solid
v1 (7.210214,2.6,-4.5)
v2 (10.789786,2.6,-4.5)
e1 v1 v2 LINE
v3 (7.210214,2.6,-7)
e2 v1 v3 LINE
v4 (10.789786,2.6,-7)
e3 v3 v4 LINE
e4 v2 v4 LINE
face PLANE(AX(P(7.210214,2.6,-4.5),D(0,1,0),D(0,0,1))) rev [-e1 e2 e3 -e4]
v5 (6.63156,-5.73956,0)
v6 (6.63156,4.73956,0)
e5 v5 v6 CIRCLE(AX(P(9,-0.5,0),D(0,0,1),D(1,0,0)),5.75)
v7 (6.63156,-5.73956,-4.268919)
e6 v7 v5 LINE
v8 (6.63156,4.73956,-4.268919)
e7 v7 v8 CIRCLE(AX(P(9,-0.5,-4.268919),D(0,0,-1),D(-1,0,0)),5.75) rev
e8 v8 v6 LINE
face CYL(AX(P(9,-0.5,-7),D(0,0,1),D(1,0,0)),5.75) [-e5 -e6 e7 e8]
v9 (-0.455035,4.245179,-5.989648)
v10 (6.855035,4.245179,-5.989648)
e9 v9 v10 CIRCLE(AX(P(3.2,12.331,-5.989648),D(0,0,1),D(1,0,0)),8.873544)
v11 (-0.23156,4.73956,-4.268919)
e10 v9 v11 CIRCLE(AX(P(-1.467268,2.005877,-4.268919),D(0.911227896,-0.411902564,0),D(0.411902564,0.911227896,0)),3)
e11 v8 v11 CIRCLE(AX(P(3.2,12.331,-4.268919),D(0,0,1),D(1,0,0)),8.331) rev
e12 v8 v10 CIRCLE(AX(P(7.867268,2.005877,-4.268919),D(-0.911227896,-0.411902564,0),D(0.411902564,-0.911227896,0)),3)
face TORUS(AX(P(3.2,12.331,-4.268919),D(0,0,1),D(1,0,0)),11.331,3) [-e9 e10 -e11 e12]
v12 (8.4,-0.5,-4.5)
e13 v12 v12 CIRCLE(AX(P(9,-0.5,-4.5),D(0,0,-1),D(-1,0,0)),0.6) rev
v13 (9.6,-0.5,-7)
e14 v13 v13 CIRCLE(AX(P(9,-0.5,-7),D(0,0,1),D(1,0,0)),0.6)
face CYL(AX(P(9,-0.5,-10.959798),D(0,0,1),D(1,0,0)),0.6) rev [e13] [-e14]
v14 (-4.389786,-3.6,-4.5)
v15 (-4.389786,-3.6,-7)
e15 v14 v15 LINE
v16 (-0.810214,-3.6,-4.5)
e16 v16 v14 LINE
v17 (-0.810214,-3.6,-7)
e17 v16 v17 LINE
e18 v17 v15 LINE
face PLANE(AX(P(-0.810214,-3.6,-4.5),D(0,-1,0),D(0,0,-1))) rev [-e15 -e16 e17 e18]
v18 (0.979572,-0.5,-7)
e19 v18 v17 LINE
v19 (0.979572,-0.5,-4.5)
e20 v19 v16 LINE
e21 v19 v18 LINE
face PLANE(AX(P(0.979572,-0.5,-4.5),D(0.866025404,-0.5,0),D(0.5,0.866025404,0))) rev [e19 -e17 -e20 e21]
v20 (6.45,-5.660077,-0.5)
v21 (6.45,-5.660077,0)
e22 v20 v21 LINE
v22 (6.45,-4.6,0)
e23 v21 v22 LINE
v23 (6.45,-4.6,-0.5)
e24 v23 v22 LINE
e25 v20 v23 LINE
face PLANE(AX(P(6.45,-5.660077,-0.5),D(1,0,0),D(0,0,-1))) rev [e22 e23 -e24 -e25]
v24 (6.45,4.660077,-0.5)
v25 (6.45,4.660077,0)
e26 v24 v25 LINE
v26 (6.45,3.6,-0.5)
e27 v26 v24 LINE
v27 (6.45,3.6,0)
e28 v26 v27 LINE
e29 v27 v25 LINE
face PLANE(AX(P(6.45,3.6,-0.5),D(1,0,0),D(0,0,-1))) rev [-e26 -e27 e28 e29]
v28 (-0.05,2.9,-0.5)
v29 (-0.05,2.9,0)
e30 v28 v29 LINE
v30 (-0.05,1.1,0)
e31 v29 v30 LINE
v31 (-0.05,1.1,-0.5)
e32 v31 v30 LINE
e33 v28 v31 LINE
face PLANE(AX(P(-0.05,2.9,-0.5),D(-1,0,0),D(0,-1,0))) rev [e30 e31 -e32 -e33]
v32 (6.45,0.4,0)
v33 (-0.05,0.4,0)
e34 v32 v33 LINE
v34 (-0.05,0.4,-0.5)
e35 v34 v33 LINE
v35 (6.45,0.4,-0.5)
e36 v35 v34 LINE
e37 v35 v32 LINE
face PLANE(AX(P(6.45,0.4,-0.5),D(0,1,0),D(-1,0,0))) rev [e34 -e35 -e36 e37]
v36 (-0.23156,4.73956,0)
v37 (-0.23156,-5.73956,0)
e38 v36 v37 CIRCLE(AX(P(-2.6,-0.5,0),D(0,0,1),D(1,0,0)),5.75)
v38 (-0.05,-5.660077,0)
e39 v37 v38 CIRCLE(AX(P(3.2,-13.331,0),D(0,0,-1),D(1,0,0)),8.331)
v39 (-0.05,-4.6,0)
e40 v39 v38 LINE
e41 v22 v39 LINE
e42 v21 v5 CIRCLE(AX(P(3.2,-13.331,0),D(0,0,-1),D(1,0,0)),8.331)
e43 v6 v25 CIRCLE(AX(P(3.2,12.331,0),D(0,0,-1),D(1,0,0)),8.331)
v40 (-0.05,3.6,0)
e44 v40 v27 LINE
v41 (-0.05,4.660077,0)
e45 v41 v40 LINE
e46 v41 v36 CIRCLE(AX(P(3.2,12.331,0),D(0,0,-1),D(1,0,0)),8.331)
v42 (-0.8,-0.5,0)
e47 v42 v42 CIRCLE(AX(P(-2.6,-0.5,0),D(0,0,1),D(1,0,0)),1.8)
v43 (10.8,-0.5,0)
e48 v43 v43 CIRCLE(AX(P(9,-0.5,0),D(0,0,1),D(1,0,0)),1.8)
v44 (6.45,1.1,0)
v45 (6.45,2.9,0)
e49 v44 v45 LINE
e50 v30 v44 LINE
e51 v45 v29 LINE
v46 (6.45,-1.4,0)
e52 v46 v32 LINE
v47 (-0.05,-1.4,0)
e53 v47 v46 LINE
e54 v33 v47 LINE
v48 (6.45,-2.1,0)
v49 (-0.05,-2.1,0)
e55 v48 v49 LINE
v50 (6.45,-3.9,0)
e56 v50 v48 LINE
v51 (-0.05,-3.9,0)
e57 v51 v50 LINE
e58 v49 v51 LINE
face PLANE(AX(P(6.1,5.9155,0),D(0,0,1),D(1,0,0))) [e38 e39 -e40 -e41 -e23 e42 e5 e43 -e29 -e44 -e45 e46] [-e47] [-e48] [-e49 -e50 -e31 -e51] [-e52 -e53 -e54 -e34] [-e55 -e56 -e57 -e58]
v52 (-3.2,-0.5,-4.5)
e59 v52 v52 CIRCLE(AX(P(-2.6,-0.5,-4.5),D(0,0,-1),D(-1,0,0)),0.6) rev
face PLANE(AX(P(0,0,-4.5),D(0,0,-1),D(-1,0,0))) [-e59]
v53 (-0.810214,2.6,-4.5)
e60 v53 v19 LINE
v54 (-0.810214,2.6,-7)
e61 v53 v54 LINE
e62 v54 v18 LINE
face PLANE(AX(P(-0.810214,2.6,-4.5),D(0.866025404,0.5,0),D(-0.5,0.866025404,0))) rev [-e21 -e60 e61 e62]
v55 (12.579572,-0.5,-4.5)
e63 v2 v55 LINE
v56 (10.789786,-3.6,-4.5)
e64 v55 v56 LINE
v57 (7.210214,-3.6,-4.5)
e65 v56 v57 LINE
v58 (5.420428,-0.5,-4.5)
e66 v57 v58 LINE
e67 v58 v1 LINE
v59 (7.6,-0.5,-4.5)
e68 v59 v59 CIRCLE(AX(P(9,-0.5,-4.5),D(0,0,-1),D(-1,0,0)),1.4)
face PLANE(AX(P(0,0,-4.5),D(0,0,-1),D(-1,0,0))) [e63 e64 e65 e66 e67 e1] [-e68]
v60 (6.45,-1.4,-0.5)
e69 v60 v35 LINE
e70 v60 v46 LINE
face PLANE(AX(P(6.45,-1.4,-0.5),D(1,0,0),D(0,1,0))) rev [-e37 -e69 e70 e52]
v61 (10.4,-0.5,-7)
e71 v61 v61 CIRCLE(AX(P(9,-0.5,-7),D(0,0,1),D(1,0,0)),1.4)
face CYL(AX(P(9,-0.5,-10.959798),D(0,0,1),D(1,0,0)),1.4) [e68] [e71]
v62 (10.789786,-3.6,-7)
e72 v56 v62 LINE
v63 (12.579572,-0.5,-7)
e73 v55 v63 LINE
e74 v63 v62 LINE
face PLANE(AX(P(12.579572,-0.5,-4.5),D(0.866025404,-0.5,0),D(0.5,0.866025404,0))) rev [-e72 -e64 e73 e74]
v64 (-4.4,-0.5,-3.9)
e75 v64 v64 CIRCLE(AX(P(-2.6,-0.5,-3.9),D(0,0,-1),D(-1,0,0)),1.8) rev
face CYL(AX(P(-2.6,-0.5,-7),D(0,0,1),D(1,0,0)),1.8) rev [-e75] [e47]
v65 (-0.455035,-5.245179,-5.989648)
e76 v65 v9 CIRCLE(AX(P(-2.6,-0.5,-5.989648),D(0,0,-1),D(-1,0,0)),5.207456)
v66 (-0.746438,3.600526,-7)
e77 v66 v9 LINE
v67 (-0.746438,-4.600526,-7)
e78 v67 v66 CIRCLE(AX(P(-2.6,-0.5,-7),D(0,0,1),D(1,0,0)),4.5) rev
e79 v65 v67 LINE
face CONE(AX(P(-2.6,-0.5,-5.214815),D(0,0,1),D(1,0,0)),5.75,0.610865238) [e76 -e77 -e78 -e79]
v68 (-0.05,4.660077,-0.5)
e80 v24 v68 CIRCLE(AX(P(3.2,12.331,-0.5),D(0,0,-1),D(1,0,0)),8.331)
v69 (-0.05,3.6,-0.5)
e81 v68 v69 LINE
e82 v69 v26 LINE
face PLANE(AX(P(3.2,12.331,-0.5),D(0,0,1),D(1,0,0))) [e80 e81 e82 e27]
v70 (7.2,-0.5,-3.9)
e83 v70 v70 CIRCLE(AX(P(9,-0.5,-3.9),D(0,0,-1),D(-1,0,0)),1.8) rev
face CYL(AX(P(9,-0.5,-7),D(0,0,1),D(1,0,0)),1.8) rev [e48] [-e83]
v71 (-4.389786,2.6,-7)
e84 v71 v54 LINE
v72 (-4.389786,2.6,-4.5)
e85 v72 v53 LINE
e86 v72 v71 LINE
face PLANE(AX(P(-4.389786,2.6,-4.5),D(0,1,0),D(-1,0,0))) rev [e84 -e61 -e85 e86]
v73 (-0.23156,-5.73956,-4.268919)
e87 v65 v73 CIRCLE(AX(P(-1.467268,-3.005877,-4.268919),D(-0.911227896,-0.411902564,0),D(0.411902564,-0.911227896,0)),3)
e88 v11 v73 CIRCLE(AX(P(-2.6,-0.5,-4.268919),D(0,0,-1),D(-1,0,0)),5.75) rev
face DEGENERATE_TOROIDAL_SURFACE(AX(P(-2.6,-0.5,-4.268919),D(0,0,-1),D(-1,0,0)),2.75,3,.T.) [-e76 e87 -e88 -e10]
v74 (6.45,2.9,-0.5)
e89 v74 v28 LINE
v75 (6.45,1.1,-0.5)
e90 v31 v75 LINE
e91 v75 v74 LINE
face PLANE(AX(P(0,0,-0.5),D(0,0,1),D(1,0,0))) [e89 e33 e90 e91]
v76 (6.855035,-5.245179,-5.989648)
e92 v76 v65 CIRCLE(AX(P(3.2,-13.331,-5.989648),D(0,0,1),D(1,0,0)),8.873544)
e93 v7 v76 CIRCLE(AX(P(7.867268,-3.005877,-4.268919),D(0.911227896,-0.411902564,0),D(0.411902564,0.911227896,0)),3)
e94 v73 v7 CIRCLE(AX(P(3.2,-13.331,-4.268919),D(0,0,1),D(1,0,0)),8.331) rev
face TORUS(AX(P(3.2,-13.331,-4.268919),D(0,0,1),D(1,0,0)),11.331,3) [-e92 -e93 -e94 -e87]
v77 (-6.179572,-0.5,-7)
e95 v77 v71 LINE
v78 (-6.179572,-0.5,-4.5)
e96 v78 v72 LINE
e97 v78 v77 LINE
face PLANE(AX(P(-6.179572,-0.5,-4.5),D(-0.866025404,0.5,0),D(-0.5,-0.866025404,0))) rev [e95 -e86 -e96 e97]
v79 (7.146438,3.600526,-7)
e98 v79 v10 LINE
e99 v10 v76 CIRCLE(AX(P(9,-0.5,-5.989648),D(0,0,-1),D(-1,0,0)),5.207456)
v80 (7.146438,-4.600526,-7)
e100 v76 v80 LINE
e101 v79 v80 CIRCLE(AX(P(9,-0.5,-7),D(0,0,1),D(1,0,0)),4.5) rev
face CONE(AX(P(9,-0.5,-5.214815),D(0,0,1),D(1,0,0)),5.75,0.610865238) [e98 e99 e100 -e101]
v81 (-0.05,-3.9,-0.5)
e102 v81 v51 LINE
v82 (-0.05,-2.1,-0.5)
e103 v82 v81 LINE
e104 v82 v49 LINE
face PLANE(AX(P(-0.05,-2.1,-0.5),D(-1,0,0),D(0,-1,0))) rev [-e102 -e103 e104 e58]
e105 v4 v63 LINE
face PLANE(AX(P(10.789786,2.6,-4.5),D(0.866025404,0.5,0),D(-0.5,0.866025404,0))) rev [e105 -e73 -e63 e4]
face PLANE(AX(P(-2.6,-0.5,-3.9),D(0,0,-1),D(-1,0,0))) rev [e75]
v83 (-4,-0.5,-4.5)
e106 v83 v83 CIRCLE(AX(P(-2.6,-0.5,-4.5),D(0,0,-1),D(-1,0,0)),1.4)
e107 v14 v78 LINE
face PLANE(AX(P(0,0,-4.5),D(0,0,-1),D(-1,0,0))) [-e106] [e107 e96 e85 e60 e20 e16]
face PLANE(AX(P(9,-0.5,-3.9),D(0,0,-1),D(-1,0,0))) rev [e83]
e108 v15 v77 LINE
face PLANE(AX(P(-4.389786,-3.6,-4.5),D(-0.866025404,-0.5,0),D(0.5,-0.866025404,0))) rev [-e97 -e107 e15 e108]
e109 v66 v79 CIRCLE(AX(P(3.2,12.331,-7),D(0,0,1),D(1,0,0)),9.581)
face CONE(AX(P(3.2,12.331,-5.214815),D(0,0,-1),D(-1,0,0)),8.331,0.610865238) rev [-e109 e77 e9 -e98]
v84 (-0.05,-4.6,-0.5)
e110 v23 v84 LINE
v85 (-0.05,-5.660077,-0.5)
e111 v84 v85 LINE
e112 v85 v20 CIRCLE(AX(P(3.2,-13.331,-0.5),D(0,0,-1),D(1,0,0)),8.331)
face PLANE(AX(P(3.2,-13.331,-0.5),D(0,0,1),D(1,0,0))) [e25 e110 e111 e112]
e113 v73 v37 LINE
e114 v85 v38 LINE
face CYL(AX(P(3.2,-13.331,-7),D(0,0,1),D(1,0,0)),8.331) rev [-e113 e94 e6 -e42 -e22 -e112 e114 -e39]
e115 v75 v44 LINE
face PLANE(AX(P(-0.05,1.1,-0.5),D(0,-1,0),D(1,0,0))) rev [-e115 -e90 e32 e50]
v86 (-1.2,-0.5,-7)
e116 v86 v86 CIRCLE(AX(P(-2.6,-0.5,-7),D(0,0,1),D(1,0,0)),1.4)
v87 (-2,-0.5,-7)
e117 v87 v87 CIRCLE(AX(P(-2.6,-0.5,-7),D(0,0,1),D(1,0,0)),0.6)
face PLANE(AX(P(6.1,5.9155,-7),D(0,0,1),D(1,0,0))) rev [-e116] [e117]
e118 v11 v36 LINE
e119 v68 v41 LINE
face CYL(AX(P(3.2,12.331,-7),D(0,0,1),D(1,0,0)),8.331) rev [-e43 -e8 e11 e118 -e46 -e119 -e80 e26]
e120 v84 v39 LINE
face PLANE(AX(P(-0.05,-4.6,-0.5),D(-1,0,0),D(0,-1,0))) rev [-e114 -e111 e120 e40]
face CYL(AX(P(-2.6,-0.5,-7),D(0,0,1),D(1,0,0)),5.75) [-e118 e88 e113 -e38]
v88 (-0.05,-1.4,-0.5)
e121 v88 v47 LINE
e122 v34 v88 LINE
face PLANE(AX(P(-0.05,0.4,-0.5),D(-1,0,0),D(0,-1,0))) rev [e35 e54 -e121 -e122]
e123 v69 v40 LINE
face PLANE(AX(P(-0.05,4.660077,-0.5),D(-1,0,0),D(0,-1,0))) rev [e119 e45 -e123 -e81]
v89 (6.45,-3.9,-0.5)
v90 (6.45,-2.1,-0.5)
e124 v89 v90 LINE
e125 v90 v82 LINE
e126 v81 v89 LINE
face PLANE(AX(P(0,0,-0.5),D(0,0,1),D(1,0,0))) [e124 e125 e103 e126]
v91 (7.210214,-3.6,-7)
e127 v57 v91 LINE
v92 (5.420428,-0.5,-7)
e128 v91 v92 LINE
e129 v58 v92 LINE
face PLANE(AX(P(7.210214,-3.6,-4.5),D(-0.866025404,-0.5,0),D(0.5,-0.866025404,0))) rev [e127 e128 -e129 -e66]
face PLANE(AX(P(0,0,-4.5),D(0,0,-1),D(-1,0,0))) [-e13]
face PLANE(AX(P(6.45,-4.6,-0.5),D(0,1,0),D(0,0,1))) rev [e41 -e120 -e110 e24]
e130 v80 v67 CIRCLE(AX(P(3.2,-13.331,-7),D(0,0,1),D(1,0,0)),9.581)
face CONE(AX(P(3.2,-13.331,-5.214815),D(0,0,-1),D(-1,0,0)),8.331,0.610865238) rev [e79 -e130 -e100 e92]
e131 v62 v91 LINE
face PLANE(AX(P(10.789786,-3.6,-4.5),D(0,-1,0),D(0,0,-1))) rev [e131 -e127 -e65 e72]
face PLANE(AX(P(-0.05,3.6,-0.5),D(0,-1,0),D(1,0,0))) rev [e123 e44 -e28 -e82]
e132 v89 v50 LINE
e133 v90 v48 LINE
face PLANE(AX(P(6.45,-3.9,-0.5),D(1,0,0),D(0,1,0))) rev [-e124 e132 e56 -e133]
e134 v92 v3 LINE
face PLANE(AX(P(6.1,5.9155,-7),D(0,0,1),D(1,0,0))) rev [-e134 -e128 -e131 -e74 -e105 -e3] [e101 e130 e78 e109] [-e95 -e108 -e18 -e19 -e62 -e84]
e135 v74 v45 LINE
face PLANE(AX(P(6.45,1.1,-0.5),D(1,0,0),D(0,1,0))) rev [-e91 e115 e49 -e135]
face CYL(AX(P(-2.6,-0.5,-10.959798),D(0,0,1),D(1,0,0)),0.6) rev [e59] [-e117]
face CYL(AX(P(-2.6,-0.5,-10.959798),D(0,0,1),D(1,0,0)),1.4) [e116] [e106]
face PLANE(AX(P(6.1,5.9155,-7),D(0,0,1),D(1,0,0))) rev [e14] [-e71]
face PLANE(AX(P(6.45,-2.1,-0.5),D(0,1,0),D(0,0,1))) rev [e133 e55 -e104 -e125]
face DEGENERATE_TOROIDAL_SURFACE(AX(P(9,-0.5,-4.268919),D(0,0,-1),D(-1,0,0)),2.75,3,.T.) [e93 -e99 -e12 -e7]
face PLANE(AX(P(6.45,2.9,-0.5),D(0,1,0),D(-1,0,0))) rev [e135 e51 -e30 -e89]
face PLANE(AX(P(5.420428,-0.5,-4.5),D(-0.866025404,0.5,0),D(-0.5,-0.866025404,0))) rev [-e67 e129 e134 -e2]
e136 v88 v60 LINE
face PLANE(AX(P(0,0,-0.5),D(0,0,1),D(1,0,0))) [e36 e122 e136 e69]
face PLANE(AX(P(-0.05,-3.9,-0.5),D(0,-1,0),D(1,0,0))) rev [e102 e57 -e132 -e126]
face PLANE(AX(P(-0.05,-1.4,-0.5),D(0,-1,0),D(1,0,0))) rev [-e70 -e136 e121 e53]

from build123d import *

# Parameters (mm, degrees)
BOSS_EXTRUDE1_DEPTH = 7
SKETCH5_R           = 1.799999865
SKETCH5_R_2         = 1.8
CUT_EXTRUDE4_DEPTH  = 18.482133737
SKETCH2_W           = 6.5
SKETCH2_H           = 1.8
CUT_EXTRUDE1_DEPTH  = 0.5
CUT_EXTRUDE5_DEPTH  = 2.5
CHAMFER1_SIZE       = 1.25
CHAMFER1_SIZE2      = 1.785185008
FILLET1_R           = 3
BOSS_EXTRUDE2_START = -0.6
SKETCH7_R           = 1.799999865
SKETCH7_R_2         = 1.8
BOSS_EXTRUDE2_DEPTH = 0.6
SKETCH8_R           = 1.399999865
SKETCH8_R_2         = 0.599999865
SKETCH8_R_3         = 1.4
SKETCH8_R_4         = 0.6
BOSS_EXTRUDE3_DEPTH = 2.5


with BuildPart() as part:
    # Sketch1 → Boss-Extrude1 (new body)
    with BuildSketch(Plane.XY):
        with BuildLine():
            ThreePointArc((6.631560259, -5.739560401), (3.2, -5), (-0.231560259, -5.739560401))
            ThreePointArc((-0.231560259, -5.739560401), (-8.35, -0.5), (-0.231560259, 4.739560401))
            ThreePointArc((-0.231560259, 4.739560401), (3.2, 4), (6.631560259, 4.739560401))
            ThreePointArc((6.631560259, 4.739560401), (14.75, -0.5), (6.631560259, -5.739560401))
        make_face()
    extrude(amount=-BOSS_EXTRUDE1_DEPTH)

    # Sketch5 → Cut-Extrude4 (cut, through all)
    with BuildSketch(Plane.XY):
        with Locations((9, -0.5)):
            Circle(SKETCH5_R)
        with Locations((-2.6, -0.5)):
            Circle(SKETCH5_R_2)
    extrude(amount=-CUT_EXTRUDE4_DEPTH, mode=Mode.SUBTRACT)

    # Sketch2 → Cut-Extrude1 (cut)
    with BuildSketch(Plane.XY):
        with Locations((3.200000135, 2)):
            Rectangle(SKETCH2_W, SKETCH2_H)
        with Locations((3.200000135, -0.5)):
            Rectangle(SKETCH2_W, SKETCH2_H)
        with BuildLine():
            Line((6.450000135, -4.6), (-0.049999865, -4.6))
            Line((-0.049999865, -4.6), (-0.049999865, -5.660076856))
            ThreePointArc((-0.049999865, -5.660076856), (3.200000146, -5), (6.450000135, -5.660076971))
            Line((6.450000135, -5.660076971), (6.450000135, -4.6))
        make_face()
        with Locations((3.200000135, -3)):
            Rectangle(SKETCH2_W, SKETCH2_H)
        with BuildLine():
            Line((6.450000135, 3.6), (6.450000135, 4.660076971))
            ThreePointArc((6.450000135, 4.660076971), (3.200000146, 4), (-0.049999865, 4.660076856))
            Line((-0.049999865, 4.660076856), (-0.049999865, 3.6))
            Line((-0.049999865, 3.6), (6.450000135, 3.6))
        make_face()
    extrude(amount=-CUT_EXTRUDE1_DEPTH, mode=Mode.SUBTRACT)

    # Sketch6 → Cut-Extrude5 (cut)
    with BuildSketch(Plane(origin=(0, 0, -7), x_dir=(-1, 0, 0), z_dir=(0, 0, -1))):
        Polygon((-0.979571669, -0.5), (0.810214166, -3.6), (4.389785834, -3.6), (6.179571669, -0.5), (4.389785834, 2.6), (0.810214166, 2.6), align=None)
        Polygon((-5.420428331, -0.5), (-7.210214166, 2.6), (-10.789785834, 2.6), (-12.579571669, -0.5), (-10.789785834, -3.6), (-7.210214166, -3.6), align=None)
    extrude(amount=-CUT_EXTRUDE5_DEPTH, mode=Mode.SUBTRACT)

    # Chamfer1
    chamfer1_edges = [part.edges().sort_by_distance(p)[0] for p in [
        (-8.35, -0.5, -7),
        (3.2, -5, -7),
        (14.75, -0.5, -7),
        (3.2, 4, -7),
    ]]
    chamfer1_side = [part.faces().sort_by_distance(p)[0] for p in [
        (3.2, -0.5, -7),
    ]]
    chamfer(chamfer1_edges, length=CHAMFER1_SIZE, length2=CHAMFER1_SIZE2, reference=chamfer1_side[0])

    # Fillet1
    # the kernel refuses this fillet: 3 mm, written as the material it takes off along each edge
    with BuildSketch(Plane(origin=(9, -0.5, -5.214814992), x_dir=(-0.41190256373837064, 0.9112278957460408, 0), z_dir=(-0.9112278957460408, -0.41190256373837064, 0))) as fillet1_piece_1:
        with BuildLine():
            CenterArc((5.75 - FILLET1_R, -FILLET1_R * 0.315298788879), FILLET1_R, 0, 35)
            Line((5.75 - FILLET1_R * 0.180847955711, FILLET1_R * 0.258277647472), (5.75, 0))
            Line((5.75, 0), (5.75, -FILLET1_R * 0.315298788879))
        make_face()
    fillet1_piece_1_solid = revolve(axis=Axis((9, -0.5, -5.214814992), (0, 0, -1)), revolution_arc=228.648814079, mode=Mode.PRIVATE)
    with BuildSketch(Plane(origin=(3.2, 12.331, -5.214814992), x_dir=(-0.41190256373837086, -0.9112278957460408, 0), z_dir=(-0.9112278957460408, 0.41190256373837086, 0))) as fillet1_piece_2:
        with BuildLine():
            CenterArc((8.331 + FILLET1_R, FILLET1_R * 0.315298788879), FILLET1_R, 180, 35)
            Line((8.331 + FILLET1_R * 0.180847955711, -FILLET1_R * 0.258277647472), (8.331, 0))
            Line((8.331, 0), (8.331, FILLET1_R * 0.315298788879))
        make_face()
    fillet1_piece_2_solid = revolve(axis=Axis((3.2, 12.331, -5.214814992), (0, 0, 1)), revolution_arc=48.648814079, mode=Mode.PRIVATE)
    with BuildSketch(Plane(origin=(3.2, -13.331, -5.214814992), x_dir=(0.41190256373837153, 0.9112278957460405, 0), z_dir=(0.9112278957460405, -0.41190256373837153, 0))) as fillet1_piece_3:
        with BuildLine():
            CenterArc((8.331 + FILLET1_R, FILLET1_R * 0.315298788879), FILLET1_R, 180, 35)
            Line((8.331 + FILLET1_R * 0.180847955711, -FILLET1_R * 0.258277647472), (8.331, 0))
            Line((8.331, 0), (8.331, FILLET1_R * 0.315298788879))
        make_face()
    fillet1_piece_3_solid = revolve(axis=Axis((3.2, -13.331, -5.214814992), (0, 0, 1)), revolution_arc=48.648814079, mode=Mode.PRIVATE)
    with BuildSketch(Plane(origin=(-2.6, -0.5, -5.214814992), x_dir=(0.41190256373837075, -0.9112278957460408, 0), z_dir=(0.9112278957460408, 0.41190256373837075, 0))) as fillet1_piece_4:
        with BuildLine():
            CenterArc((5.75 - FILLET1_R, -FILLET1_R * 0.315298788879), FILLET1_R, 0, 35)
            Line((5.75 - FILLET1_R * 0.180847955711, FILLET1_R * 0.258277647472), (5.75, 0))
            Line((5.75, 0), (5.75, -FILLET1_R * 0.315298788879))
        make_face()
    fillet1_piece_4_solid = revolve(axis=Axis((-2.6, -0.5, -5.214814992), (0, 0, -1)), revolution_arc=228.648814079, mode=Mode.PRIVATE)
    add([fillet1_piece_1_solid, fillet1_piece_2_solid, fillet1_piece_3_solid, fillet1_piece_4_solid], mode=Mode.SUBTRACT)

    # Sketch7 → Boss-Extrude2 (add)
    with BuildSketch(Plane(origin=(0, 0, -4.5), x_dir=(-1, 0, 0), z_dir=(0, 0, -1)).offset(BOSS_EXTRUDE2_START)):
        with Locations(Location((-9, -0.5, 0), (0, 0, 180))):
            Circle(SKETCH7_R)
        with Locations(Location((2.6, -0.5, 0), (0, 0, 180))):
            Circle(SKETCH7_R_2)
    extrude(amount=BOSS_EXTRUDE2_DEPTH)

    # Sketch8 → Boss-Extrude3 (add)
    # profile 1 of 2: a face of its own
    with BuildSketch(Plane(origin=(0, 0, -4.5), x_dir=(-1, 0, 0), z_dir=(0, 0, -1))):
        with Locations(Location((-9, -0.5, 0), (0, 0, 180))):
            Circle(SKETCH8_R)
        with Locations(Location((-9, -0.5, 0), (0, 0, 180))):
            Circle(SKETCH8_R_2, mode=Mode.SUBTRACT)
    # profile 2 of 2: a face of its own
    with BuildSketch(Plane(origin=(0, 0, -4.5), x_dir=(-1, 0, 0), z_dir=(0, 0, -1))):
        with Locations(Location((2.6, -0.5, 0), (0, 0, 180))):
            Circle(SKETCH8_R_3)
        with Locations(Location((2.6, -0.5, 0), (0, 0, 180))):
            Circle(SKETCH8_R_4, mode=Mode.SUBTRACT)
    extrude(amount=BOSS_EXTRUDE3_DEPTH)


solid = part.part
